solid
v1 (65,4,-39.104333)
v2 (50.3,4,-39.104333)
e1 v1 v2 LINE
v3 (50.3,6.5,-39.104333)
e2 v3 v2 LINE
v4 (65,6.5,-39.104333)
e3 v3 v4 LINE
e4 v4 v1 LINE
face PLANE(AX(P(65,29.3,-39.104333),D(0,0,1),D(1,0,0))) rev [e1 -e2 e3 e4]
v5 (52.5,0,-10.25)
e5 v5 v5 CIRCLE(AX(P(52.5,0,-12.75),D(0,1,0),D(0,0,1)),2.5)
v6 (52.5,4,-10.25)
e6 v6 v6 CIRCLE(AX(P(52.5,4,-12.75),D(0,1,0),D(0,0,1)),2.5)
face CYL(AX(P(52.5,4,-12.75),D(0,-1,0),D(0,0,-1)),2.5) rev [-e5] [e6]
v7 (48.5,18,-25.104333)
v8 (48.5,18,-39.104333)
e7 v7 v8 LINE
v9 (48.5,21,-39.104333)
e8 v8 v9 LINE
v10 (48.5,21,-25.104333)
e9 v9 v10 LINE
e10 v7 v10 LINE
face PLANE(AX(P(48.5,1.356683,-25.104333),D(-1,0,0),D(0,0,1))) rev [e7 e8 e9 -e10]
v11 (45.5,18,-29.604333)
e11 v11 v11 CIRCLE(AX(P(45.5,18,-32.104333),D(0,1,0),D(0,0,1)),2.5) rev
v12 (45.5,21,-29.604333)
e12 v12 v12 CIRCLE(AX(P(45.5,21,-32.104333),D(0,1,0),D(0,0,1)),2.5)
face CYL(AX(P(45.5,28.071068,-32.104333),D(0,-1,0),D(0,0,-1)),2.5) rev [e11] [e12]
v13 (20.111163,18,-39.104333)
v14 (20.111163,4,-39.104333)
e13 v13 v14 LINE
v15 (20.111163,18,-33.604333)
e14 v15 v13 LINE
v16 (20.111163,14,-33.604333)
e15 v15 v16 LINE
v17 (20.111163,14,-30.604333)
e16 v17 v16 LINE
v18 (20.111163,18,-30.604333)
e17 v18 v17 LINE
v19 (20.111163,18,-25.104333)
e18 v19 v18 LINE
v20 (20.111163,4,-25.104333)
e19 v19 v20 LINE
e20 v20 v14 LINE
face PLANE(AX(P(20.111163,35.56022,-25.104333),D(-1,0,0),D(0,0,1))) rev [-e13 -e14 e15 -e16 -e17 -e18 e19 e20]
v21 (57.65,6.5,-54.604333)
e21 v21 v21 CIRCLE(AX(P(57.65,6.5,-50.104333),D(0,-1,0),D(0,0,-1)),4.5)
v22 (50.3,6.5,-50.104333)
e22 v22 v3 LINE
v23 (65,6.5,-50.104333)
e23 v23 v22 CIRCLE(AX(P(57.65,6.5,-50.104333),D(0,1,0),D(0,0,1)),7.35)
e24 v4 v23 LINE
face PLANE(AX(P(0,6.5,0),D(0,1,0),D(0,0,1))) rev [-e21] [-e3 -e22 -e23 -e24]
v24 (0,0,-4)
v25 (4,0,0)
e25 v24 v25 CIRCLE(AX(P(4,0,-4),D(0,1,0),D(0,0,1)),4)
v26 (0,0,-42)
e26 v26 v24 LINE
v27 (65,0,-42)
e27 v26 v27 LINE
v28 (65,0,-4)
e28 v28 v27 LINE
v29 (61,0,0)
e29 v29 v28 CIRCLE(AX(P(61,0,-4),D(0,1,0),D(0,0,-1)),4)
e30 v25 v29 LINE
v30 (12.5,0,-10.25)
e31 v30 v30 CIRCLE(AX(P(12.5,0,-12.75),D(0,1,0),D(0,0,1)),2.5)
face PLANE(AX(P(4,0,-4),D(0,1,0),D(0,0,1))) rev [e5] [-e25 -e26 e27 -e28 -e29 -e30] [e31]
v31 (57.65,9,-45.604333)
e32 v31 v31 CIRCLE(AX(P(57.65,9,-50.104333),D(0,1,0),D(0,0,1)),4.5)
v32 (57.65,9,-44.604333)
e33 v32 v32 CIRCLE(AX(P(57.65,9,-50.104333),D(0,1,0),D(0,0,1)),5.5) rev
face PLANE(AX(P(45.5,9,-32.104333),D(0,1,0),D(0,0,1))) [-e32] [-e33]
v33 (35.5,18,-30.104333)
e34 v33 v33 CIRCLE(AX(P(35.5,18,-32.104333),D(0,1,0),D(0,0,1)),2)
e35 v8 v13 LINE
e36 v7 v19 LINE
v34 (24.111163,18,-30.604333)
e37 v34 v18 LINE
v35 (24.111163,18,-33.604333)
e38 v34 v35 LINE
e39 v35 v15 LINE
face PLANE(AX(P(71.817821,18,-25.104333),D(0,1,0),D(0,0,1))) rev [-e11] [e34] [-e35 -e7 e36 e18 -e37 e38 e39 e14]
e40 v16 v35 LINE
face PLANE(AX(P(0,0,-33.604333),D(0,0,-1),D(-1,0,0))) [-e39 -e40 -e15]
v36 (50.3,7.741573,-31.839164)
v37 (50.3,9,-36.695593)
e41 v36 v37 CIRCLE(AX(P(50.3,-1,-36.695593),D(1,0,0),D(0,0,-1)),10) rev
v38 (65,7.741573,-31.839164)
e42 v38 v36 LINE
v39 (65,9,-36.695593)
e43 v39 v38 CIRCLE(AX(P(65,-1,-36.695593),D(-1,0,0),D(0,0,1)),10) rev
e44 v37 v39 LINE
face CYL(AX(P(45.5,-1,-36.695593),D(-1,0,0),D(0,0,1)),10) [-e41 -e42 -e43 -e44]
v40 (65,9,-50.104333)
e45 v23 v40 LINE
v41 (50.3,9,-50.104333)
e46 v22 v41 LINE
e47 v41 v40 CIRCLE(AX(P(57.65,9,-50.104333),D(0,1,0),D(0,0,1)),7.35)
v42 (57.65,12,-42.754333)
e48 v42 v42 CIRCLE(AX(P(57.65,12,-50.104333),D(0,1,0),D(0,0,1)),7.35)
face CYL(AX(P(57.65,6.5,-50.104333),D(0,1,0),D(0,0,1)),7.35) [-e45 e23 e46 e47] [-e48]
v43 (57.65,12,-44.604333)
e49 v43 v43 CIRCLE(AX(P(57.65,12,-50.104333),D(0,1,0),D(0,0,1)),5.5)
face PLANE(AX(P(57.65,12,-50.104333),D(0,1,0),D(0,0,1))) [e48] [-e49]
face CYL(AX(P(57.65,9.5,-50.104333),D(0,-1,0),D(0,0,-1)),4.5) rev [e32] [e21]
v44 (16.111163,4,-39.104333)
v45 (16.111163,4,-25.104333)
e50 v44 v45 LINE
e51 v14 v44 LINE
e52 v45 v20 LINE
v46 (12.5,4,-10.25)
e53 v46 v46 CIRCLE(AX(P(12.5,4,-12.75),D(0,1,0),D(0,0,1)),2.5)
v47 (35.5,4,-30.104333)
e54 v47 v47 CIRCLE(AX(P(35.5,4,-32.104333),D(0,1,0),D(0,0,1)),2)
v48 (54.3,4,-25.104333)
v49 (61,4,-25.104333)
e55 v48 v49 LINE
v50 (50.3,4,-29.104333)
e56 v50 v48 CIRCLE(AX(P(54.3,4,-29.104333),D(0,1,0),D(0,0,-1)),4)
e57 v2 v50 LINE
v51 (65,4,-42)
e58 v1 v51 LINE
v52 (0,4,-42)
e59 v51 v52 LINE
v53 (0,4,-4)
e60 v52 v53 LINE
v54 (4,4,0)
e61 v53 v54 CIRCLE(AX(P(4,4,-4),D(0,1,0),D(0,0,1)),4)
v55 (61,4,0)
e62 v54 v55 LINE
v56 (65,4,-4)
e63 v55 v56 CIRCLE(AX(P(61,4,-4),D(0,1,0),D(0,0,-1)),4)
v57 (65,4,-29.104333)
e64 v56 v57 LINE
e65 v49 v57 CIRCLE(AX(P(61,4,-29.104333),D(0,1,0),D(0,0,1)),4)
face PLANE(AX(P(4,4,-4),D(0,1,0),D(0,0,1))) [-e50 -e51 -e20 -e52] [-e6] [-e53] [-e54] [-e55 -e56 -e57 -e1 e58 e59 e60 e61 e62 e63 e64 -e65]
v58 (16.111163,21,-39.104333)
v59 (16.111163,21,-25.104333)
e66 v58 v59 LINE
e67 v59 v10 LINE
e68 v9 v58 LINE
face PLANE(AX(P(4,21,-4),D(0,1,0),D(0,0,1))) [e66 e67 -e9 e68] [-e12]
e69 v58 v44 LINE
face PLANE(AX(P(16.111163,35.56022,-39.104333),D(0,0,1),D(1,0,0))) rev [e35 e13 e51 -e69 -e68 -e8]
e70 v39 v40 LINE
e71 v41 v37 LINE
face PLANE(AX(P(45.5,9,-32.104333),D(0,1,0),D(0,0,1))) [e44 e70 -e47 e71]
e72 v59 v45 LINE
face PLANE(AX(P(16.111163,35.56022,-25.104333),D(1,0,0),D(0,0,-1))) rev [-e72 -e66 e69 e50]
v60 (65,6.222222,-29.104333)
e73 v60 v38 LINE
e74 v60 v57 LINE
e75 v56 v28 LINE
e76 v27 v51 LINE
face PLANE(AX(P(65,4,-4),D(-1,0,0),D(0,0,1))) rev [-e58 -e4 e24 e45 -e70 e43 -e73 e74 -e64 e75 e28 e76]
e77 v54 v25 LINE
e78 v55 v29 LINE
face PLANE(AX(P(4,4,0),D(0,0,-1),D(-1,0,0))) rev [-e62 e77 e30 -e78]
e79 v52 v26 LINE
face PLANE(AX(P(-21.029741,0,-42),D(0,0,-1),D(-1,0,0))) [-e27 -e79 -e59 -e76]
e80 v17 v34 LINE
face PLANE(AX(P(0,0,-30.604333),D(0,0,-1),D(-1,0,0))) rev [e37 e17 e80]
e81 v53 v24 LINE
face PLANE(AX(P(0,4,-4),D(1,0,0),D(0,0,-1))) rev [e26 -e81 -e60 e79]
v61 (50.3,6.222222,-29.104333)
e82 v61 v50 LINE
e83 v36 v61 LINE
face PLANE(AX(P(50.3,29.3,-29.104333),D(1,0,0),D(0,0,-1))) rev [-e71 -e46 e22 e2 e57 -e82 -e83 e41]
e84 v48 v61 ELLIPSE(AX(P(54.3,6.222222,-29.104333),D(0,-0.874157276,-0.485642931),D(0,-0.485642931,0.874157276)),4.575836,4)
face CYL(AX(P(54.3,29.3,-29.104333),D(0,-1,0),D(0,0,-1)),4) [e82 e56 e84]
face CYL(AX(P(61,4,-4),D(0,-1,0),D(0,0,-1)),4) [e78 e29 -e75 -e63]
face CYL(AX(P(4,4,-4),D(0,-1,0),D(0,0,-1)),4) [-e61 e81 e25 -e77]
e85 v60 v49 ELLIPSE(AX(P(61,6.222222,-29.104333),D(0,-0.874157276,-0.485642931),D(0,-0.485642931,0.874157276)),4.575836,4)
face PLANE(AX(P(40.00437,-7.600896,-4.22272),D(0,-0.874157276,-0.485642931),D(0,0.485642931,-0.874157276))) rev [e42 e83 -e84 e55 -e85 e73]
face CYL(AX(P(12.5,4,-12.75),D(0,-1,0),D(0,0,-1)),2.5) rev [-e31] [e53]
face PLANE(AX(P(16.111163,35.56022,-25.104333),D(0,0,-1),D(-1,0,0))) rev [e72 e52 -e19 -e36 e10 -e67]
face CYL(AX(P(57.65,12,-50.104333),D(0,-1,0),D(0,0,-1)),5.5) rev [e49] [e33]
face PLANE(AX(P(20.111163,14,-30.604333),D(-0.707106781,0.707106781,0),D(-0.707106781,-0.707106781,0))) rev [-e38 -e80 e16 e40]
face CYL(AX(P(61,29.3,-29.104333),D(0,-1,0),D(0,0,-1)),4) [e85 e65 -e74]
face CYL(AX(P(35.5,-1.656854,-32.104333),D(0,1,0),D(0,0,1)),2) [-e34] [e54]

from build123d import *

# Parameters (mm, degrees)
SKETCH1_R                = 2.5
BOSS_EXTRUDE1_DEPTH      = 4
SKETCH2_R                = 2
SKETCH2_W                = 65
SKETCH2_H                = 4
BOSS_EXTRUDE2_DEPTH      = 13
BOSS_EXTRUDE3_DEPTH      = 4
SKETCH4_W                = 65
SKETCH4_H                = 4
BOSS_EXTRUDE4_DEPTH      = 20
FILLET1_R                = 4
SKETCH6_R                = 2.5
CUT_EXTRUDE1_DEPTH       = 20
SKETCH7_W                = 46
SKETCH7_H                = 4
CUT_EXTRUDE2_DEPTH       = 80
BOSS_EXTRUDE6_DEPTH      = 2.5
BOSS_EXTRUDE6_DEPTH_BACK = 2.5
CUT_EXTRUDE3_REACH       = 94.25
FILLET2_R                = 4
BOSS_EXTRUDE5_START      = 5
SKETCH8_R                = 6
SKETCH8_R_2              = 2.5
BOSS_EXTRUDE5_DEPTH      = 5
FILLET3_R                = 4
BOSS_EXTRUDE7_START      = 4
BOSS_EXTRUDE7_DEPTH      = 3.5
SKETCH13_R               = 4.5
CUT_EXTRUDE4_DEPTH       = 6
SKETCH14_W               = 13.282344927
SKETCH14_H               = 18
CUT_EXTRUDE5_DEPTH       = 6
FILLET5_R                = 4
SKETCH15_W               = 65
SKETCH15_H               = 4
BOSS_EXTRUDE8_DEPTH      = 20
SKETCH16_R               = 2.5
CUT_EXTRUDE6_DEPTH       = 30
SKETCH18_W               = 5.451877136
SKETCH18_H               = 11.015996258
BOSS_EXTRUDE9_DEPTH      = 17
CUT_EXTRUDE7_START       = -3.235556
SKETCH19_W               = 62
SKETCH19_H               = 17
CUT_EXTRUDE7_DEPTH       = 10.735556
BOSS_EXTRUDE10_START     = 5
SKETCH20_R               = 4
SKETCH20_R_2             = 2.5
BOSS_EXTRUDE10_DEPTH     = 5
SKETCH21_W               = 4
SKETCH21_H               = 14
BOSS_EXTRUDE11_DEPTH     = 17
SKETCH22_W               = 14
SKETCH22_H               = 3
BOSS_EXTRUDE12_DEPTH     = 37.388836628
CUT_EXTRUDE8_START       = 12
SKETCH24_R               = 2.5
CUT_EXTRUDE8_DEPTH       = 12
SKETCH25_W               = 11.015996258
SKETCH25_H               = 17
CUT_EXTRUDE9_DEPTH       = 5.451877136
SKETCH26_R               = 6
CUT_EXTRUDE10_DEPTH      = 5
BOSS_EXTRUDE13_START     = -4
SKETCH27_R               = 4.5
BOSS_EXTRUDE13_DEPTH     = 4
BOSS_EXTRUDE14_DEPTH     = 5
CUT_EXTRUDE11_DEPTH      = 14.7
FILLET6_R                = 10
BOSS_EXTRUDE15_START     = -2.5
SKETCH32_R               = 4
BOSS_EXTRUDE15_DEPTH     = 2.5
SKETCH28_W               = 20
SKETCH28_H               = 4
CUT_EXTRUDE12_DEPTH      = 65
SKETCH33_W               = 9
SKETCH33_H               = 14
CUT_EXTRUDE13_DEPTH      = 3
BOSS_EXTRUDE18_START     = -8.5
BOSS_EXTRUDE18_DEPTH     = 3
SKETCH35_R               = 2
BOSS_EXTRUDE19_DEPTH     = 17
SKETCH37_R               = 7.35
SKETCH37_R_2             = 5.5
BOSS_EXTRUDE20_DEPTH     = 3
SKETCH38_R               = 4.5
CUT_EXTRUDE14_DEPTH      = 3


with BuildPart() as part:
    # Sketch1 → Boss-Extrude1 (new body)
    with BuildSketch(Plane(origin=(0, 0, 0), x_dir=(1, 0, 0), z_dir=(0, 1, 0))):
        with BuildLine():
            Line((4, 0), (61, 0))
            ThreePointArc((61, 0), (63.828427125, 1.171572875), (65, 4))
            Line((65, 4), (65, 42))
            Line((65, 42), (0, 42))
            Line((0, 42), (0, 4))
            ThreePointArc((0, 4), (1.171572875, 1.171572875), (4, 0))
        make_face()
        with Locations(Location((12.5, 12.75, 0), (0, 0, 270))):
            Circle(SKETCH1_R, mode=Mode.SUBTRACT)
        with Locations(Location((52.5, 12.75, 0), (0, 0, 270))):
            Circle(SKETCH1_R, mode=Mode.SUBTRACT)
    extrude(amount=BOSS_EXTRUDE1_DEPTH)

    # Sketch2 → Boss-Extrude2 (add)
    with BuildSketch(Plane(origin=(0, 4, 0), x_dir=(1, 0, 0), z_dir=(0, 1, 0))):
        with Locations(Location((61, 4, 0), (0, 0, 90))):
            Circle(SKETCH2_R)
        with Locations(Location((4, 4, 0), (0, 0, 90))):
            Circle(SKETCH2_R)
        with Locations((32.5, 40)):
            Rectangle(SKETCH2_W, SKETCH2_H)
    extrude(amount=BOSS_EXTRUDE2_DEPTH)

    # Sketch3 → Boss-Extrude3 (add)
    with BuildSketch(Plane(origin=(0, 17, 0), x_dir=(1, 0, 0), z_dir=(0, 1, 0))):
        with BuildLine():
            Line((0, 42), (65, 42))
            Line((65, 42), (65, 4))
            ThreePointArc((65, 4), (63.828427125, 1.171572875), (61, 0))
            Line((61, 0), (4, 0))
            ThreePointArc((4, 0), (1.171572875, 1.171572875), (0, 4))
            Line((0, 4), (0, 42))
        make_face()
    extrude(amount=BOSS_EXTRUDE3_DEPTH)

    # Sketch4 → Boss-Extrude4 (add)
    with BuildSketch(Plane(origin=(0, 0, -42), x_dir=(-1, 0, 0), z_dir=(0, 0, -1))):
        with Locations((-32.5, 19)):
            Rectangle(SKETCH4_W, SKETCH4_H)
    extrude(amount=BOSS_EXTRUDE4_DEPTH)

    # Fillet1
    fillet1_edges = [part.edges().sort_by_distance(p)[0] for p in [
        (65, 19, -62),
        (0, 19, -62),
    ]]
    fillet(fillet1_edges, radius=FILLET1_R)

    # Sketch6 → Cut-Extrude1 (cut)
    with BuildSketch(Plane(origin=(0, 21, 0), x_dir=(1, 0, 0), z_dir=(0, 1, 0))):
        with Locations(Location((57.65, 50.10433299, 0), (0, 0, 270))):
            Circle(SKETCH6_R)
        with Locations(Location((45.5, 32.10433299, 0), (0, 0, 270))):
            Circle(SKETCH6_R)
    extrude(amount=-CUT_EXTRUDE1_DEPTH, mode=Mode.SUBTRACT)

    # Sketch7 → Cut-Extrude2 (cut)
    with BuildSketch(Plane.XY):
        Polygon((4, 17), (4, 21), (0, 21), (0, 4), (50, 4), (50, 17), align=None)
        with Locations((27, 19)):
            Rectangle(SKETCH7_W, SKETCH7_H)
    extrude(amount=-CUT_EXTRUDE2_DEPTH, mode=Mode.SUBTRACT)

    # Sketch10 → Boss-Extrude6 (add, two sides: drawn at the far end of the back side and taken through both)
    with BuildSketch(Plane(origin=(57.5, 0, 0), x_dir=(0, 0, -1), z_dir=(1, 0, 0)).offset(-BOSS_EXTRUDE6_DEPTH_BACK)):
        Polygon((33, 4), (38, 9), (38, 4), align=None)
    extrude(amount=BOSS_EXTRUDE6_DEPTH + BOSS_EXTRUDE6_DEPTH_BACK)

    # Cut-Extrude3: up to this face of the body (flat: up to its plane)
    cut_extrude3_end = Plane(part.part.faces().sort_by_distance((31.433090337, 4, -20.592914262))[0])
    # Sketch11 → Cut-Extrude3 (cut, up to the picked face)
    with BuildSketch(Plane(origin=(0, 21, 0), x_dir=(1, 0, 0), z_dir=(0, 1, 0)), mode=Mode.PRIVATE) as cut_extrude3_sk1:
        with BuildLine():
            Line((57.5, 0), (57.5, 42))
            ThreePointArc((57.5, 42), (56.914213562, 43.414213562), (55.5, 44))
            Line((55.5, 44), (50, 44))
            Line((50, 44), (50, 0))
            Line((50, 0), (57.5, 0))
        make_face()
    cut_extrude3_tool1 = split(extrude(cut_extrude3_sk1.sketch, amount=-CUT_EXTRUDE3_REACH, mode=Mode.PRIVATE), bisect_by=cut_extrude3_end, keep=Keep.BOTH, mode=Mode.PRIVATE)
    add(cut_extrude3_tool1.solids().sort_by(Axis((53.741385, 21, -21.943789), (0, -1, 0)))[0], mode=Mode.SUBTRACT)

    # Fillet2
    # the kernel refuses this fillet: 4 mm, written as the material it takes off along each edge
    with BuildSketch(Plane(origin=(57.5, 30.921567416, 0), x_dir=(1, 0, 0), z_dir=(0, -1, 0))) as fillet2_piece_1:
        with BuildLine():
            CenterArc((4, -3.968626967), FILLET2_R, 97.180755781, 82.819244219)
            Line((0, -3.968626967), (-0.08, -3.968626967))
            Line((-0.08, -3.968626967), (-0.08, 0))
            Line((-0.08, 0), (0, 0.08))
            ThreePointArc((0, 0.08), (1.75, 0.08), (3.49, 0.079372539))
            Line((3.49, 0.079372539), (3.5, 0))
        make_face()
    extrude(amount=23.843134833, mode=Mode.SUBTRACT)

    # Sketch8 → Boss-Extrude5 (add)
    with BuildSketch(Plane(origin=(0, 4, 0), x_dir=(1, 0, 0), z_dir=(0, 1, 0)).offset(BOSS_EXTRUDE5_START)):
        with Locations(Location((45.5, 32.10433299, 0), (0, 0, 270))):
            Circle(SKETCH8_R)
        with Locations(Location((45.5, 32.10433299, 0), (0, 0, 270))):
            Circle(SKETCH8_R_2, mode=Mode.SUBTRACT)
    extrude(amount=-BOSS_EXTRUDE5_DEPTH)

    # Fillet3
    fillet3_edges = [part.edges().sort_by_distance(p)[0] for p in [
        (50, 19, -62),
    ]]
    fillet(fillet3_edges, radius=FILLET3_R)

    # Sketch12 → Boss-Extrude7 (add)
    with BuildSketch(Plane(origin=(57.5, 0, 0), x_dir=(0, 0, -1), z_dir=(1, 0, 0)).offset(BOSS_EXTRUDE7_START)):
        Polygon((42, 12), (47, 17), (42, 17), align=None)
    extrude(amount=BOSS_EXTRUDE7_DEPTH)

    # Sketch13 → Cut-Extrude4 (cut)
    with BuildSketch(Plane.XZ):
        with Locations(Location((45.5, -32.10433299, 0), (0, 0, 270))):
            Circle(SKETCH13_R)
    extrude(amount=-CUT_EXTRUDE4_DEPTH, mode=Mode.SUBTRACT)

    # Sketch14 → Cut-Extrude5 (cut)
    with BuildSketch(Plane(origin=(0, 21, 0), x_dir=(1, 0, 0), z_dir=(0, 1, 0))):
        with Locations((47.623272126, 53)):
            Rectangle(SKETCH14_W, SKETCH14_H)
    extrude(amount=-CUT_EXTRUDE5_DEPTH, mode=Mode.SUBTRACT)

    # Fillet5
    fillet5_edges = [part.edges().sort_by_distance(p)[0] for p in [
        (54.264444589, 19, -62),
        (54.264444589, 19, -44),
    ]]
    fillet(fillet5_edges, radius=FILLET5_R)

    # Sketch15 → Boss-Extrude8 (add)
    with BuildSketch(Plane(origin=(0, 0, -42), x_dir=(-1, 0, 0), z_dir=(0, 0, -1))):
        with Locations((-32.5, 2)):
            Rectangle(SKETCH15_W, SKETCH15_H)
    extrude(amount=BOSS_EXTRUDE8_DEPTH)

    # Sketch16 → Cut-Extrude6 (cut)
    with BuildSketch(Plane(origin=(0, 21, 0), x_dir=(1, 0, 0), z_dir=(0, 1, 0))):
        with Locations(Location((57.65, 50.10433299, 0), (0, 0, 270))):
            Circle(SKETCH16_R)
    extrude(amount=-CUT_EXTRUDE6_DEPTH, mode=Mode.SUBTRACT)

    # Sketch18 → Boss-Extrude9 (add)
    with BuildSketch(Plane(origin=(0, 4, 0), x_dir=(1, 0, 0), z_dir=(0, 1, 0))):
        with Locations((32.967615748, 5.507998129)):
            Rectangle(SKETCH18_W, SKETCH18_H)
    extrude(amount=BOSS_EXTRUDE9_DEPTH)

    # Sketch19 → Cut-Extrude7 (cut)
    with BuildSketch(Plane(origin=(57.5, 0, 0), x_dir=(0, 0, -1), z_dir=(1, 0, 0)).offset(CUT_EXTRUDE7_START)):
        with Locations((31, 12.5)):
            Rectangle(SKETCH19_W, SKETCH19_H)
    extrude(amount=CUT_EXTRUDE7_DEPTH, mode=Mode.SUBTRACT)

    # Sketch20 → Boss-Extrude10 (add)
    with BuildSketch(Plane(origin=(0, 4, 0), x_dir=(1, 0, 0), z_dir=(0, 1, 0)).offset(BOSS_EXTRUDE10_START)):
        with Locations(Location((57.65, 50.10433299, 0), (0, 0, 270))):
            Circle(SKETCH20_R)
        with Locations(Location((57.65, 50.10433299, 0), (0, 0, 270))):
            Circle(SKETCH20_R_2, mode=Mode.SUBTRACT)
    extrude(amount=-BOSS_EXTRUDE10_DEPTH)

    # Sketch21 → Boss-Extrude11 (add)
    with BuildSketch(Plane(origin=(0, 4, 0), x_dir=(1, 0, 0), z_dir=(0, 1, 0))):
        with Locations((18.111163372, 32.10433299)):
            Rectangle(SKETCH21_W, SKETCH21_H)
    extrude(amount=BOSS_EXTRUDE11_DEPTH)

    # Sketch22 → Boss-Extrude12 (add)
    with BuildSketch(Plane(origin=(20.111163372, 0, 0), x_dir=(0, 0, -1), z_dir=(1, 0, 0))):
        with Locations((32.10433299, 19.5)):
            Rectangle(SKETCH22_W, SKETCH22_H)
    extrude(amount=BOSS_EXTRUDE12_DEPTH)

    # Sketch24 → Cut-Extrude8 (cut)
    with BuildSketch(Plane(origin=(0, 9, 0), x_dir=(1, 0, 0), z_dir=(0, 1, 0)).offset(CUT_EXTRUDE8_START)):
        with Locations(Location((45.5, 32.10433299, 0), (0, 0, 270))):
            Circle(SKETCH24_R)
    extrude(amount=-CUT_EXTRUDE8_DEPTH, mode=Mode.SUBTRACT)

    # Sketch25 → Cut-Extrude9 (cut)
    with BuildSketch(Plane(origin=(35.693554316, 0, 0), x_dir=(0, 0, -1), z_dir=(1, 0, 0))):
        with Locations((5.507998129, 12.5)):
            Rectangle(SKETCH25_W, SKETCH25_H)
    extrude(amount=-CUT_EXTRUDE9_DEPTH, mode=Mode.SUBTRACT)

    # Sketch26 → Cut-Extrude10 (cut)
    with BuildSketch(Plane(origin=(0, 9, 0), x_dir=(1, 0, 0), z_dir=(0, 1, 0))):
        with Locations((45.5, 32.10433299)):
            Circle(SKETCH26_R)
    extrude(amount=-CUT_EXTRUDE10_DEPTH, mode=Mode.SUBTRACT)

    # Sketch27 → Boss-Extrude13 (add)
    with BuildSketch(Plane(origin=(0, 4, 0), x_dir=(1, 0, 0), z_dir=(0, 1, 0)).offset(BOSS_EXTRUDE13_START)):
        with Locations((45.5, 32.10433299)):
            Circle(SKETCH27_R)
    extrude(amount=BOSS_EXTRUDE13_DEPTH)

    # Sketch29 → Boss-Extrude14 (add)
    with BuildSketch(Plane(origin=(0, 4, 0), x_dir=(1, 0, 0), z_dir=(0, 1, 0))):
        with BuildLine():
            Line((61, 25.10433299), (54.3, 25.10433299))
            ThreePointArc((54.3, 25.10433299), (51.471572875, 26.275905866), (50.3, 29.10433299))
            Line((50.3, 29.10433299), (50.3, 39.10433299))
            Line((50.3, 39.10433299), (65, 39.10433299))
            Line((65, 39.10433299), (65, 29.10433299))
            ThreePointArc((65, 29.10433299), (63.828427125, 26.275905866), (61, 25.10433299))
        make_face()
    extrude(amount=BOSS_EXTRUDE14_DEPTH)

    # Sketch31 → Cut-Extrude11 (cut)
    with BuildSketch(Plane(origin=(65, 0, 0), x_dir=(0, 0, -1), z_dir=(1, 0, 0))):
        Polygon((25.10433299, 9), (25.10433299, 4), (29.10433299, 6.222222222), (29.10433299, 9), align=None)
        Polygon((29.10433299, 9), (29.10433299, 6.222222222), (34.10433299, 9), align=None)
    extrude(amount=-CUT_EXTRUDE11_DEPTH, mode=Mode.SUBTRACT)

    # Fillet6
    fillet6_edges = [part.edges().sort_by_distance(p)[0] for p in [
        (57.65, 9, -34.10433299),
    ]]
    fillet(fillet6_edges, radius=FILLET6_R)

    # Sketch32 → Boss-Extrude15 (add)
    with BuildSketch(Plane(origin=(0, 9, 0), x_dir=(1, 0, 0), z_dir=(0, 1, 0)).offset(BOSS_EXTRUDE15_START)):
        with BuildLine():
            Line((65, 39.10433299), (65, 50.10433299))
            ThreePointArc((65, 50.10433299), (57.65, 57.45433299), (50.3, 50.10433299))
            Line((50.3, 50.10433299), (50.3, 39.10433299))
            Line((50.3, 39.10433299), (65, 39.10433299))
        make_face()
        with Locations(Location((57.65, 50.10433299, 0), (0, 0, 270))):
            Circle(SKETCH32_R, mode=Mode.SUBTRACT)
    extrude(amount=BOSS_EXTRUDE15_DEPTH)

    # Sketch28 → Cut-Extrude12 (cut)
    with BuildSketch(Plane(origin=(65, 0, 0), x_dir=(0, 0, -1), z_dir=(1, 0, 0))):
        Polygon((42, 4), (62, 4), (62, 6.5), (50.10433299, 6.5), (42, 6.5), align=None)
        with Locations((52, 2)):
            Rectangle(SKETCH28_W, SKETCH28_H)
    extrude(amount=-CUT_EXTRUDE12_DEPTH, mode=Mode.SUBTRACT)

    # Sketch33 → Cut-Extrude13 (cut)
    with BuildSketch(Plane(origin=(0, 21, 0), x_dir=(1, 0, 0), z_dir=(0, 1, 0))):
        with Locations((53, 32.10433299)):
            Rectangle(SKETCH33_W, SKETCH33_H)
    extrude(amount=-CUT_EXTRUDE13_DEPTH, mode=Mode.SUBTRACT)

    # Sketch34 → Boss-Extrude18 (add)
    with BuildSketch(Plane.XY.offset(-25.10433299).offset(BOSS_EXTRUDE18_START)):
        Polygon((20.111163372, 14), (24.111163372, 18), (20.111163372, 18), align=None)
    extrude(amount=BOSS_EXTRUDE18_DEPTH)

    # Sketch35 → Boss-Extrude19 (add)
    with BuildSketch(Plane(origin=(0, 21, 0), x_dir=(1, 0, 0), z_dir=(0, 1, 0))):
        with Locations(Location((35.5, 32.10433299, 0), (0, 0, 270))):
            Circle(SKETCH35_R)
    extrude(amount=-BOSS_EXTRUDE19_DEPTH)

    # Sketch37 → Boss-Extrude20 (add)
    with BuildSketch(Plane(origin=(0, 9, 0), x_dir=(1, 0, 0), z_dir=(0, 1, 0))):
        with Locations(Location((57.65, 50.10433299, 0), (0, 0, 270))):
            Circle(SKETCH37_R)
        with Locations(Location((57.65, 50.10433299, 0), (0, 0, 270))):
            Circle(SKETCH37_R_2, mode=Mode.SUBTRACT)
    extrude(amount=BOSS_EXTRUDE20_DEPTH)

    # Sketch38 → Cut-Extrude14 (cut)
    with BuildSketch(Plane.XZ.offset(-6.5)):
        with Locations(Location((57.65, -50.10433299, 0), (0, 0, 270))):
            Circle(SKETCH38_R)
    extrude(amount=-CUT_EXTRUDE14_DEPTH, mode=Mode.SUBTRACT)


solid = part.part
